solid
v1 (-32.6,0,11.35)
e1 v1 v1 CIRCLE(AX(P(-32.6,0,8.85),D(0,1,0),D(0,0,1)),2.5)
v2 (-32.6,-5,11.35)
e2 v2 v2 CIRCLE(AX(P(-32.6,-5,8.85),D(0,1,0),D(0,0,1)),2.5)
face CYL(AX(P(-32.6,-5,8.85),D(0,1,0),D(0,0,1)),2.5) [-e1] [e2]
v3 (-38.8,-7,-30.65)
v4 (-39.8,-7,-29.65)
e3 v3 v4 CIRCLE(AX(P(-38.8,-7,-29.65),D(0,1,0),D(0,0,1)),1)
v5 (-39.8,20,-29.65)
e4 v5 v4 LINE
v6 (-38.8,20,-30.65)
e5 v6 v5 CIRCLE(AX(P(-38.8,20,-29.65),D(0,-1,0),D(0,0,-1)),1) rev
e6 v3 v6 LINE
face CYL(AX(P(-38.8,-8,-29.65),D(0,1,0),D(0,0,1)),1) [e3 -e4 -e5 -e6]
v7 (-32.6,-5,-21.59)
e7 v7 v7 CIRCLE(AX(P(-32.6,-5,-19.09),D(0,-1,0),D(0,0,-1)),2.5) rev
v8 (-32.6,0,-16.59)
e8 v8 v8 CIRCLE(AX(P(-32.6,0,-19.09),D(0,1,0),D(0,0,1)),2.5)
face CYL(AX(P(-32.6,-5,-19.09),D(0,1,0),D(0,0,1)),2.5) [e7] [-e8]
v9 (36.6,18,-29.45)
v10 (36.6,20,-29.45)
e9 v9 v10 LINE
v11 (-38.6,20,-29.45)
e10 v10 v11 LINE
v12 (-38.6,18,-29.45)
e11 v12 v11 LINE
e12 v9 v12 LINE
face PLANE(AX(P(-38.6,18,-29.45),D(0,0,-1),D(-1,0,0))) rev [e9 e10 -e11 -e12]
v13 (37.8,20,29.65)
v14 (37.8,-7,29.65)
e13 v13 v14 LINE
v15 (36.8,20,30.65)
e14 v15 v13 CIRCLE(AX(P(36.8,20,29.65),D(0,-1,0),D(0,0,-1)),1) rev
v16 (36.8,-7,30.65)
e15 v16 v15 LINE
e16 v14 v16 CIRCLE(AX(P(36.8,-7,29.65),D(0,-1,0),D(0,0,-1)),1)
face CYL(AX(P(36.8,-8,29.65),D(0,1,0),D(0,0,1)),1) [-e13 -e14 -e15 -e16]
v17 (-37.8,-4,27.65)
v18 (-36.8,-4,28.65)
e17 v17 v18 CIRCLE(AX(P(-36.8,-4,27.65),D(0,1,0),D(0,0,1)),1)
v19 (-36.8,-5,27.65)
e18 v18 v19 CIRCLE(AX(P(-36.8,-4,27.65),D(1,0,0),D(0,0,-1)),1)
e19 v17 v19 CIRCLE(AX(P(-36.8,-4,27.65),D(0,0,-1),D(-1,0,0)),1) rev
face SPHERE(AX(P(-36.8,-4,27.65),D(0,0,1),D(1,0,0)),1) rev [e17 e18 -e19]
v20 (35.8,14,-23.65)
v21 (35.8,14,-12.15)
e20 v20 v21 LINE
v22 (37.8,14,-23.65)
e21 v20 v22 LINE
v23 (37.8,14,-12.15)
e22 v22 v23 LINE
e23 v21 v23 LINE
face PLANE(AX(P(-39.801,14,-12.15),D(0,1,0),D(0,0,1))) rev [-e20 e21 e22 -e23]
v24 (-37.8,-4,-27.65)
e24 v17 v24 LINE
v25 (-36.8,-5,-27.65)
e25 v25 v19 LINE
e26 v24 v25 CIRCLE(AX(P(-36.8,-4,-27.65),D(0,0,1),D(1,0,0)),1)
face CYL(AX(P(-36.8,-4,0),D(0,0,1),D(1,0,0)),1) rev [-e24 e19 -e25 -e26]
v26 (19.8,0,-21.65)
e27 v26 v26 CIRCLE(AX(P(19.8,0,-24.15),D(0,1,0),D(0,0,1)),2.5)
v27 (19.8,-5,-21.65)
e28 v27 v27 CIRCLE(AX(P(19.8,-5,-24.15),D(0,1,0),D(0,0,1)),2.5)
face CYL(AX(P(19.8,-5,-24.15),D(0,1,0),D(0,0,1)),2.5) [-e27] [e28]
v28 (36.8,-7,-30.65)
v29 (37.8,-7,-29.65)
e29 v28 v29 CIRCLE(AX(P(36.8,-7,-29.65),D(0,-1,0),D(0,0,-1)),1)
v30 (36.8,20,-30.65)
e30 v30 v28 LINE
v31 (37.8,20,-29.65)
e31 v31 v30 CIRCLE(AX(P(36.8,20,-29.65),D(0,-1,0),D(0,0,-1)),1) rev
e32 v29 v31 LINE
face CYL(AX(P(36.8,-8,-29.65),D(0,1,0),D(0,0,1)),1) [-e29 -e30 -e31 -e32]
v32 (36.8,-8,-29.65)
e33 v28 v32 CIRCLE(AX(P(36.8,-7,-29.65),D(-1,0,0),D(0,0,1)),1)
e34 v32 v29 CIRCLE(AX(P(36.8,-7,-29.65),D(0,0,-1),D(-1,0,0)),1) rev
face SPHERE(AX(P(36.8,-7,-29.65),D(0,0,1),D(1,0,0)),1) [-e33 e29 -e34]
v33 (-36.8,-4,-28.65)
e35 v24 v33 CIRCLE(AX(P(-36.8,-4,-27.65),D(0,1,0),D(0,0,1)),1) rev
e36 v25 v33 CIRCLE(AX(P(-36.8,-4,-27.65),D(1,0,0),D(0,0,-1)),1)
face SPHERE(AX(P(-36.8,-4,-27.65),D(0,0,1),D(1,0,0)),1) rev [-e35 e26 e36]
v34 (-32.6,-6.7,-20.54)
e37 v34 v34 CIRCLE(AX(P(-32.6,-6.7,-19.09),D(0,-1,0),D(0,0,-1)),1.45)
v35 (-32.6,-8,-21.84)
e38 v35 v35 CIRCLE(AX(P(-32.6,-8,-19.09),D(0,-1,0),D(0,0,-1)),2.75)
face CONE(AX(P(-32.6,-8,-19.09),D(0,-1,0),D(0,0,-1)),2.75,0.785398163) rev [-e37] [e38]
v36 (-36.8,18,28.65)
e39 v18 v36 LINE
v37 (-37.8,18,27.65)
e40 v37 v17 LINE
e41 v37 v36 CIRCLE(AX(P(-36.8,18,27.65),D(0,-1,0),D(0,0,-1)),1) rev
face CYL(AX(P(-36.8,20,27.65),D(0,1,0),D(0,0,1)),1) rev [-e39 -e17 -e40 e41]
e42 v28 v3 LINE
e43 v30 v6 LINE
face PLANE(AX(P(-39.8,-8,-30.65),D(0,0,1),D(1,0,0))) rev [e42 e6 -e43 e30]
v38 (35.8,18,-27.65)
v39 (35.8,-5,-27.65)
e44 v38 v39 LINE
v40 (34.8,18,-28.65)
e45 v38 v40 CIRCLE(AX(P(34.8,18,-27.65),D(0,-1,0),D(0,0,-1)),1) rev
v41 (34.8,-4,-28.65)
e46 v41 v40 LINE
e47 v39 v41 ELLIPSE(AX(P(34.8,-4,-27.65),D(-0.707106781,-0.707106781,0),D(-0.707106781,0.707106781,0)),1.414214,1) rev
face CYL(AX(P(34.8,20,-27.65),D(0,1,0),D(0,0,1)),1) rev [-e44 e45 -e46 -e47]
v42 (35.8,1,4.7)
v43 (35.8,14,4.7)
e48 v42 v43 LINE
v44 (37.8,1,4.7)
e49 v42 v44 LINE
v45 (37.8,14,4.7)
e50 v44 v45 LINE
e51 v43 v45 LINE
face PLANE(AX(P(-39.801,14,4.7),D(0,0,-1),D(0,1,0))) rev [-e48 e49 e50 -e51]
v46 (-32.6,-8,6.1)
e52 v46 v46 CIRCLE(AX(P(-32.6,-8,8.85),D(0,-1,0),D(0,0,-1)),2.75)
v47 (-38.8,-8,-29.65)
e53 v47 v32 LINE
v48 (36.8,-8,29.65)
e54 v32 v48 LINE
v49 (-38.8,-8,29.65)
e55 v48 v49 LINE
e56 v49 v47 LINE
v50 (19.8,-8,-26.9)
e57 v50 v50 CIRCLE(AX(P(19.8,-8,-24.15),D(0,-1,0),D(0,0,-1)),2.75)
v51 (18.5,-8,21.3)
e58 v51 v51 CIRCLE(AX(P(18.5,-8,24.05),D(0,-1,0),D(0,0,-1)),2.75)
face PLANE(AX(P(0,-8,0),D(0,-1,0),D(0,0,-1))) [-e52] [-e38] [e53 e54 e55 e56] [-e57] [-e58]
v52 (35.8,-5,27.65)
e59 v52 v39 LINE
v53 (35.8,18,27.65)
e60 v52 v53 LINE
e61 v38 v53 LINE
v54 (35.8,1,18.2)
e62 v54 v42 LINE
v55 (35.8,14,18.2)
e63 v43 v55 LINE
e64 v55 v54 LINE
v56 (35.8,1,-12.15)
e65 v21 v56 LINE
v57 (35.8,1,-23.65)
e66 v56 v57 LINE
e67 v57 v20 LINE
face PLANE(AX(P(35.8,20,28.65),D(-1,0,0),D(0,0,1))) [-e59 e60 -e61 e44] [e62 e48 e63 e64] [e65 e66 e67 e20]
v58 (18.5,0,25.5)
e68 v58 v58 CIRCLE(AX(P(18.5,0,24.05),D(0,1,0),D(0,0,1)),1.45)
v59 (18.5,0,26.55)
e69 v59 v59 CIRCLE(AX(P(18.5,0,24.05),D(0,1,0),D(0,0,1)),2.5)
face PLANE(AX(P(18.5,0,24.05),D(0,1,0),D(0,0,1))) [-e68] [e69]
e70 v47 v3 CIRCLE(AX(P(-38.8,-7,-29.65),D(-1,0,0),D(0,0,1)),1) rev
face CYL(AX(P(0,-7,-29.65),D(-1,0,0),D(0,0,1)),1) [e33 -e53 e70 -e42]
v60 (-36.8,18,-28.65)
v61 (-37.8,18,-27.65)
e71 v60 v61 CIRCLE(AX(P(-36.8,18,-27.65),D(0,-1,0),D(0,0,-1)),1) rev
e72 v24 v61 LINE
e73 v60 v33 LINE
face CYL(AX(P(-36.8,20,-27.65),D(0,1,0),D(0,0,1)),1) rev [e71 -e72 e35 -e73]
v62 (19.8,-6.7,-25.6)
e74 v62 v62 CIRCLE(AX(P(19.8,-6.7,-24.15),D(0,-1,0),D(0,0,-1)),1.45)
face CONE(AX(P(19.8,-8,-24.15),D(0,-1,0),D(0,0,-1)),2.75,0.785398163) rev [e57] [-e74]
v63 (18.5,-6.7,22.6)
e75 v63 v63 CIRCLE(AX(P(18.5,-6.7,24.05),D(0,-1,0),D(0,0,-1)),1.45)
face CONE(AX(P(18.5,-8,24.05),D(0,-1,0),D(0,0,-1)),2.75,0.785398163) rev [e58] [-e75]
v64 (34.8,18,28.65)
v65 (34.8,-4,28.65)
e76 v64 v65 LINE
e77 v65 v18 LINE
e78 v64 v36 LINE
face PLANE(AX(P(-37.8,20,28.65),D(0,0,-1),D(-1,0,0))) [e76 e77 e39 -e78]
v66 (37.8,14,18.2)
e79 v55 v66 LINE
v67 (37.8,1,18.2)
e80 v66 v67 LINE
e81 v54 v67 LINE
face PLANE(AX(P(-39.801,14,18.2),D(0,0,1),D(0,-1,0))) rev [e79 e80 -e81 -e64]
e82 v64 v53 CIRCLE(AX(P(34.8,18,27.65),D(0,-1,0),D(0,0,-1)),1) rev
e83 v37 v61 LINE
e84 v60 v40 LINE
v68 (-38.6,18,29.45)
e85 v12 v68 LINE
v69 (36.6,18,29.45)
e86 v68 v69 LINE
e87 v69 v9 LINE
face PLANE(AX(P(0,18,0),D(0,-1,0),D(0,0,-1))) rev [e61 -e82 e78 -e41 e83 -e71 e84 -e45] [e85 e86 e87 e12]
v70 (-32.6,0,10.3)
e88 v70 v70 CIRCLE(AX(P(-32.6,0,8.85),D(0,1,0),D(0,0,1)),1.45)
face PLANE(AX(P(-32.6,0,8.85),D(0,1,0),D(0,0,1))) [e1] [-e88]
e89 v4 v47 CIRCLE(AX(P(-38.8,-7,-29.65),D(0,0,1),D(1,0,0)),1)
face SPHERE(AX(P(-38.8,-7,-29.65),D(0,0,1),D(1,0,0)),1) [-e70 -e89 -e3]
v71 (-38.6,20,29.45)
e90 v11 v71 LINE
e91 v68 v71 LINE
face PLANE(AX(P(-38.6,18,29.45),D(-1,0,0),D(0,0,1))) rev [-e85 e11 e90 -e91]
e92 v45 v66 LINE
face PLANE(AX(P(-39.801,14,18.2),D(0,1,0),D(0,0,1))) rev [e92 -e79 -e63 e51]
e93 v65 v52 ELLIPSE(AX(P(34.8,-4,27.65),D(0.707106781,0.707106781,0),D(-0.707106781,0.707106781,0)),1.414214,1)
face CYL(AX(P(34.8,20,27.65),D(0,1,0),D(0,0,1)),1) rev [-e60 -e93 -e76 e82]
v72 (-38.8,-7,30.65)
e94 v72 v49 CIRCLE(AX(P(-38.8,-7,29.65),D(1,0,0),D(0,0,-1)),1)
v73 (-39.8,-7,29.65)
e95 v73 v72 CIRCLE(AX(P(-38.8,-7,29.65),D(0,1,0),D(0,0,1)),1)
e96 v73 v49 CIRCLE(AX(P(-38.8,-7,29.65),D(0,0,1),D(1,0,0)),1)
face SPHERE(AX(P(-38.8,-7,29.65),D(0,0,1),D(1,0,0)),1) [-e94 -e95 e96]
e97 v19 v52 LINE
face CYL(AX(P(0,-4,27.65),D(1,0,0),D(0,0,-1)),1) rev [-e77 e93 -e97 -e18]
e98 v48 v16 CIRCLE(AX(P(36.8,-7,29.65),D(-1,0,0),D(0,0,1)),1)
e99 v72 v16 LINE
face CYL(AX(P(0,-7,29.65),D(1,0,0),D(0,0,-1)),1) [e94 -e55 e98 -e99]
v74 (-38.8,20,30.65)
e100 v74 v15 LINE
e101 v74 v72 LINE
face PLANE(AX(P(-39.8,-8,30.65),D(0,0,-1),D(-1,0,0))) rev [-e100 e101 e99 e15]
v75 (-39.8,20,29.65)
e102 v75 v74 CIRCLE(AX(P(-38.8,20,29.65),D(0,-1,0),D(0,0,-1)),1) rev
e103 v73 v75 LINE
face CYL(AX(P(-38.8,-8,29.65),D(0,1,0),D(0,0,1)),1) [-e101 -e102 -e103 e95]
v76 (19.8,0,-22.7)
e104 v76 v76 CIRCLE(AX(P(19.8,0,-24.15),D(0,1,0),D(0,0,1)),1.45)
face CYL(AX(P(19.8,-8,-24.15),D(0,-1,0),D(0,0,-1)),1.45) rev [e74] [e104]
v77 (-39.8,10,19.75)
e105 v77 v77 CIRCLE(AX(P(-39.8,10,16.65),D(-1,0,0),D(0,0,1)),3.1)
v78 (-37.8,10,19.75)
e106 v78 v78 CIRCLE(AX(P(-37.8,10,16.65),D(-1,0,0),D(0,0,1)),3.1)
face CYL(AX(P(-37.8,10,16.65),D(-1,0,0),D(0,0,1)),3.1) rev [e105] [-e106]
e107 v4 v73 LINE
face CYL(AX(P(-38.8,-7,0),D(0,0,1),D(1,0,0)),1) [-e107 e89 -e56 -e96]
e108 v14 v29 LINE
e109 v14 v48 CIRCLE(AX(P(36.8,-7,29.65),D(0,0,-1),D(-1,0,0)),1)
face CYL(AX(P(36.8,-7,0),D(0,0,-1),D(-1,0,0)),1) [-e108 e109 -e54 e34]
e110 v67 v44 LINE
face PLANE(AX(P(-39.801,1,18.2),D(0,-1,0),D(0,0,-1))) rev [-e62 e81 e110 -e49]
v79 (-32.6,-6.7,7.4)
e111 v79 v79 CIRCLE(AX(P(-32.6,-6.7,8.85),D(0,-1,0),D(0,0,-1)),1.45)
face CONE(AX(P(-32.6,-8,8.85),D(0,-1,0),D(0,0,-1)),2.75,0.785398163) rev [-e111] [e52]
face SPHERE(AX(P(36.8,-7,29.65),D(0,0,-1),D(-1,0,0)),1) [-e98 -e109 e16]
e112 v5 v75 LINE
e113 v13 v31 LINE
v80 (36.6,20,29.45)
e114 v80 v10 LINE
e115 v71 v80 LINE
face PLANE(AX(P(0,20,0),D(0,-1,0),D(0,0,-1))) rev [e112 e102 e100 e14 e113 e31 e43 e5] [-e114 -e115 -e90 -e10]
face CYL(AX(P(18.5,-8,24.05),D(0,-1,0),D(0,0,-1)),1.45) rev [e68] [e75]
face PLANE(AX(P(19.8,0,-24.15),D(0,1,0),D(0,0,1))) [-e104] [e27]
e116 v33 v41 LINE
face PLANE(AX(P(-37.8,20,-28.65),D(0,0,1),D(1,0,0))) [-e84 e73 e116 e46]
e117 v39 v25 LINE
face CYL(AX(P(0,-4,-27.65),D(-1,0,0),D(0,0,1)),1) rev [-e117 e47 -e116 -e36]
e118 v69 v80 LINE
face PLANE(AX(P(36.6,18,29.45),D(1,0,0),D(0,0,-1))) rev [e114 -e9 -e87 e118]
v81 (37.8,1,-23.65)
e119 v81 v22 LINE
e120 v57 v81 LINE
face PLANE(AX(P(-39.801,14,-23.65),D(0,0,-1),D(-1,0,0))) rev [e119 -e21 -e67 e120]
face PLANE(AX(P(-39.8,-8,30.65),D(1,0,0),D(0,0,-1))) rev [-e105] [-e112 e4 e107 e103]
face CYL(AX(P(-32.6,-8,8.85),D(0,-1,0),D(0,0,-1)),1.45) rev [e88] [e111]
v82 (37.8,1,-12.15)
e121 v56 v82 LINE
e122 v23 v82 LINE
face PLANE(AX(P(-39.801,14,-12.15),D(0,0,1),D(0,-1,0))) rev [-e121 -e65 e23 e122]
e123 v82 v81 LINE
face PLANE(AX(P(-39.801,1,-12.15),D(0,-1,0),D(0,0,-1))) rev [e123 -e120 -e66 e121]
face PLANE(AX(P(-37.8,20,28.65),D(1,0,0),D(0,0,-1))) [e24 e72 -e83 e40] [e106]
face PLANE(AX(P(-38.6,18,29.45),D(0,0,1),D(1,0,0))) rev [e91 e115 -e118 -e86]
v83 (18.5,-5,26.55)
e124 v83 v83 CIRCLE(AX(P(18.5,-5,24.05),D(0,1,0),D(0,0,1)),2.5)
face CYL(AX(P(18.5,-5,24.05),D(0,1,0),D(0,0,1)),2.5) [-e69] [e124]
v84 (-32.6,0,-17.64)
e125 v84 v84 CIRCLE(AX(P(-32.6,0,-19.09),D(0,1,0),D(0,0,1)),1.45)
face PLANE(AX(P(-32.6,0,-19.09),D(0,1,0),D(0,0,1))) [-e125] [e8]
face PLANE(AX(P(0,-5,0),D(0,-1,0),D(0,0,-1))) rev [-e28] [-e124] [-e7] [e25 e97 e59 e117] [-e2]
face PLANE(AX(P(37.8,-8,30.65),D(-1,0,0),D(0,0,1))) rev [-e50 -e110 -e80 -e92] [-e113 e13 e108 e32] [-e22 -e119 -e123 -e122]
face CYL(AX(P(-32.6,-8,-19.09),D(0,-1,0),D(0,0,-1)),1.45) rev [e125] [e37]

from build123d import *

# Parameters (mm, degrees)
SKETCH1_R                                         = 2.5
BOSS_EXTRUDE1_DEPTH                               = 5
BOSS_EXTRUDE1_2_DEPTH                             = 5
BOSS_EXTRUDE1_3_DEPTH                             = 5
BOSS_EXTRUDE1_4_DEPTH                             = 5
SKETCH3_W                                         = 77.6
SKETCH3_H                                         = 61.3
BOSS_EXTRUDE2_DEPTH                               = 3
SKETCH4_W                                         = 77.6
SKETCH4_H                                         = 61.3
SKETCH4_W_2                                       = 73.6
SKETCH4_H_2                                       = 57.3
BOSS_EXTRUDE3_DEPTH                               = 25
CUT_EXTRUDE2_REACH                                = 87.797
SKETCH5_W                                         = 13.5
SKETCH5_H                                         = 13
SKETCH5_W_2                                       = 11.5
FILLET1_R                                         = 1
SKETCH7_W                                         = 75.2
SKETCH7_H                                         = 58.9
CUT_EXTRUDE3_DEPTH                                = 2
SKETCH2_R                                         = 1
CUT_EXTRUDE1_DEPTH                                = 55.069053071
CSK_FOR_M2_5_FLAT_HEAD_MACHINE_SCREW1_D           = 2.9
CSK_FOR_M2_5_FLAT_HEAD_MACHINE_SCREW1_CSINK_D     = 5.5
CSK_FOR_M2_5_FLAT_HEAD_MACHINE_SCREW1_CSINK_ANGLE = 90
SKETCH12_R                                        = 3.1
CUT_EXTRUDE4_DEPTH                                = 2
FILLET3_R                                         = 1
FILLET4_R                                         = 1


with BuildPart() as part:
    # Sketch1 → Boss-Extrude1 (new body)
    with BuildSketch(Plane(origin=(0, 0, 0), x_dir=(1, 0, 0), z_dir=(0, 1, 0))):
        with Locations(Location((-32.6, 19.09, 0), (0, 0, 270))):
            Circle(SKETCH1_R)
    extrude(amount=-BOSS_EXTRUDE1_DEPTH)



with BuildPart() as body_2:
    # Sketch1 → Boss-Extrude1 2 (new body)
    with BuildSketch(Plane(origin=(0, 0, 0), x_dir=(1, 0, 0), z_dir=(0, 1, 0))):
        with Locations(Location((-32.6, -8.85, 0), (0, 0, 270))):
            Circle(SKETCH1_R)
    extrude(amount=-BOSS_EXTRUDE1_2_DEPTH)


with BuildPart() as body_3:
    # Sketch1 → Boss-Extrude1 3 (new body)
    with BuildSketch(Plane(origin=(0, 0, 0), x_dir=(1, 0, 0), z_dir=(0, 1, 0))):
        with Locations(Location((19.8, 24.15, 0), (0, 0, 270))):
            Circle(SKETCH1_R)
    extrude(amount=-BOSS_EXTRUDE1_3_DEPTH)


with BuildPart() as body_4:
    # Sketch1 → Boss-Extrude1 4 (new body)
    with BuildSketch(Plane(origin=(0, 0, 0), x_dir=(1, 0, 0), z_dir=(0, 1, 0))):
        with Locations(Location((18.5, -24.05, 0), (0, 0, 270))):
            Circle(SKETCH1_R)
    extrude(amount=-BOSS_EXTRUDE1_4_DEPTH)


with BuildPart() as part_1:
    add(part.part)

    add(body_2.part)  # Boss-Extrude2 merges body 2

    add(body_3.part)  # Boss-Extrude2 merges body 3

    add(body_4.part)  # Boss-Extrude2 merges body 4
    # Sketch3 → Boss-Extrude2 (add)
    with BuildSketch(Plane.XZ.offset(5)):
        with Locations((-1, 0)):
            Rectangle(SKETCH3_W, SKETCH3_H)
    extrude(amount=BOSS_EXTRUDE2_DEPTH)

    # Sketch4 → Boss-Extrude3 (add)
    with BuildSketch(Plane(origin=(0, -5, 0), x_dir=(1, 0, 0), z_dir=(0, 1, 0))):
        with Locations((-1, 0)):
            Rectangle(SKETCH4_W, SKETCH4_H)
        with Locations((-1, 0)):
            Rectangle(SKETCH4_W_2, SKETCH4_H_2, mode=Mode.SUBTRACT)
    extrude(amount=BOSS_EXTRUDE3_DEPTH)

    # Sketch5 → Cut-Extrude2 (cut, up to next)
    with BuildSketch(Plane(origin=(37.8, 0, 0), x_dir=(0, 0, -1), z_dir=(1, 0, 0)), mode=Mode.PRIVATE) as cut_extrude2_sk1:
        with Locations((-11.45, 7.5)):
            Rectangle(SKETCH5_W, SKETCH5_H)
    cut_extrude2_tool1 = extrude(cut_extrude2_sk1.sketch, amount=-CUT_EXTRUDE2_REACH, mode=Mode.PRIVATE) & part_1.part
    # Sketch5 → Cut-Extrude2 (cut, up to next)
    with BuildSketch(Plane(origin=(37.8, 0, 0), x_dir=(0, 0, -1), z_dir=(1, 0, 0)), mode=Mode.PRIVATE) as cut_extrude2_sk2:
        with Locations((17.9, 7.5)):
            Rectangle(SKETCH5_W_2, SKETCH5_H)
    cut_extrude2_tool2 = extrude(cut_extrude2_sk2.sketch, amount=-CUT_EXTRUDE2_REACH, mode=Mode.PRIVATE) & part_1.part
    add(cut_extrude2_tool1.solids().sort_by_distance((37.8, 7.5, 11.45))[0], mode=Mode.SUBTRACT)
    add(cut_extrude2_tool2.solids().sort_by_distance((37.8, 7.5, -17.9))[0], mode=Mode.SUBTRACT)

    # Fillet1
    fillet1_edges = [part_1.edges().sort_by_distance(p)[0] for p in [
        (-1, -5, 28.65),
        (-1, -5, -28.65),
        (-37.8, -5, 0),
        (35.8, 7.5, -28.65),
        (-37.8, 7.5, -28.65),
        (-37.8, 7.5, 28.65),
        (35.8, 7.5, 28.65),
        (37.8, -8, 0),
    ]]
    fillet(fillet1_edges, radius=FILLET1_R)

    # Sketch7 → Cut-Extrude3 (cut)
    with BuildSketch(Plane(origin=(0, 20, 0), x_dir=(1, 0, 0), z_dir=(0, 1, 0))):
        with Locations((-1, 0)):
            Rectangle(SKETCH7_W, SKETCH7_H)
    extrude(amount=-CUT_EXTRUDE3_DEPTH, mode=Mode.SUBTRACT)

    # Sketch2 → Cut-Extrude1 (cut, through all)
    with BuildSketch(Plane(origin=(0, 0, 0), x_dir=(1, 0, 0), z_dir=(0, 1, 0))):
        with Locations(Location((-32.6, -8.85, 0), (0, 0, 270))):
            Circle(SKETCH2_R)
        with Locations(Location((-32.6, 19.09, 0), (0, 0, 270))):
            Circle(SKETCH2_R)
        with Locations(Location((19.8, 24.15, 0), (0, 0, 270))):
            Circle(SKETCH2_R)
        with Locations(Location((18.5, -24.05, 0), (0, 0, 270))):
            Circle(SKETCH2_R)
    extrude(amount=-CUT_EXTRUDE1_DEPTH, mode=Mode.SUBTRACT)

    # CSK for M2.5 Flat Head Machine Screw1 (through all)
    with Locations(Plane(origin=(0, -8, 0), x_dir=(-1, 0, 0), z_dir=(0, -1, 0))):
        with Locations((32.6, 19.09), (32.6, -8.85), (-18.5, -24.05), (-19.8, 24.15)):
            CounterSinkHole(CSK_FOR_M2_5_FLAT_HEAD_MACHINE_SCREW1_D / 2, CSK_FOR_M2_5_FLAT_HEAD_MACHINE_SCREW1_CSINK_D / 2, counter_sink_angle=CSK_FOR_M2_5_FLAT_HEAD_MACHINE_SCREW1_CSINK_ANGLE)

    # Sketch12 → Cut-Extrude4 (cut)
    with BuildSketch(Plane.ZY.offset(39.8)):
        with Locations((16.65, 10)):
            Circle(SKETCH12_R)
    extrude(amount=-CUT_EXTRUDE4_DEPTH, mode=Mode.SUBTRACT)

    # Fillet3
    fillet3_edges = [part_1.edges().sort_by_distance(p)[0] for p in [
        (-39.8, 6, 30.65),
        (-39.8, 6, -30.65),
        (-1.5, -8, -30.65),
        (-1.5, -8, 30.65),
        (37.8, 6.5, 30.65),
        (37.507106781, -7.707106781, 30.65),
        (37.8, 6.5, -30.65),
        (37.507106781, -7.707106781, -30.65),
    ]]
    fillet(fillet3_edges, radius=FILLET3_R)

    # Fillet4
    # the kernel refuses this fillet: 1 mm, written as the material it takes off along each edge
    with BuildSketch(Plane(origin=(-38.8, -7, -29.65), x_dir=(0, -1, 0), z_dir=(-1, 0, 0))) as fillet4_piece_1_section:
        Polygon((0, 0), (FILLET4_R, 0), (FILLET4_R, -FILLET4_R), (0, -FILLET4_R), align=None)
    fillet4_piece_1 = extrude(amount=FILLET4_R, mode=Mode.PRIVATE)
    fillet4_piece_1 = fillet4_piece_1 - Plane(origin=(-38.8, -7, -29.65), x_dir=(0, 0.7071067811865475, 0.7071067811865475), z_dir=(-1, 0, 0)) * Sphere(FILLET4_R, mode=Mode.PRIVATE)
    add(fillet4_piece_1, mode=Mode.SUBTRACT)
    with BuildSketch(Plane(origin=(-38.8, -7, 29.65), x_dir=(0, -1, 0), z_dir=(-1, 0, 0))) as fillet4_piece_2_section:
        Polygon((0, 0), (FILLET4_R, 0), (FILLET4_R, FILLET4_R), (0, FILLET4_R), align=None)
    fillet4_piece_2 = extrude(amount=FILLET4_R, mode=Mode.PRIVATE)
    fillet4_piece_2 = fillet4_piece_2 - Plane(origin=(-38.8, -7, 29.65), x_dir=(0, 0.7071067811865475, -0.7071067811865475), z_dir=(-1, 0, 0)) * Sphere(FILLET4_R, mode=Mode.PRIVATE)
    add(fillet4_piece_2, mode=Mode.SUBTRACT)
    with BuildSketch(Plane(origin=(-39.8, -8, -29.65), x_dir=(0, 1, 0), z_dir=(0, 0, 1))) as fillet4_piece_3:
        with BuildLine():
            CenterArc((FILLET4_R, -FILLET4_R), FILLET4_R, 90, 90)
            Line((0, -FILLET4_R), (0, 0))
            Line((0, 0), (FILLET4_R, 0))
        make_face()
    extrude(amount=59.3, mode=Mode.SUBTRACT)


solid = part_1.part
